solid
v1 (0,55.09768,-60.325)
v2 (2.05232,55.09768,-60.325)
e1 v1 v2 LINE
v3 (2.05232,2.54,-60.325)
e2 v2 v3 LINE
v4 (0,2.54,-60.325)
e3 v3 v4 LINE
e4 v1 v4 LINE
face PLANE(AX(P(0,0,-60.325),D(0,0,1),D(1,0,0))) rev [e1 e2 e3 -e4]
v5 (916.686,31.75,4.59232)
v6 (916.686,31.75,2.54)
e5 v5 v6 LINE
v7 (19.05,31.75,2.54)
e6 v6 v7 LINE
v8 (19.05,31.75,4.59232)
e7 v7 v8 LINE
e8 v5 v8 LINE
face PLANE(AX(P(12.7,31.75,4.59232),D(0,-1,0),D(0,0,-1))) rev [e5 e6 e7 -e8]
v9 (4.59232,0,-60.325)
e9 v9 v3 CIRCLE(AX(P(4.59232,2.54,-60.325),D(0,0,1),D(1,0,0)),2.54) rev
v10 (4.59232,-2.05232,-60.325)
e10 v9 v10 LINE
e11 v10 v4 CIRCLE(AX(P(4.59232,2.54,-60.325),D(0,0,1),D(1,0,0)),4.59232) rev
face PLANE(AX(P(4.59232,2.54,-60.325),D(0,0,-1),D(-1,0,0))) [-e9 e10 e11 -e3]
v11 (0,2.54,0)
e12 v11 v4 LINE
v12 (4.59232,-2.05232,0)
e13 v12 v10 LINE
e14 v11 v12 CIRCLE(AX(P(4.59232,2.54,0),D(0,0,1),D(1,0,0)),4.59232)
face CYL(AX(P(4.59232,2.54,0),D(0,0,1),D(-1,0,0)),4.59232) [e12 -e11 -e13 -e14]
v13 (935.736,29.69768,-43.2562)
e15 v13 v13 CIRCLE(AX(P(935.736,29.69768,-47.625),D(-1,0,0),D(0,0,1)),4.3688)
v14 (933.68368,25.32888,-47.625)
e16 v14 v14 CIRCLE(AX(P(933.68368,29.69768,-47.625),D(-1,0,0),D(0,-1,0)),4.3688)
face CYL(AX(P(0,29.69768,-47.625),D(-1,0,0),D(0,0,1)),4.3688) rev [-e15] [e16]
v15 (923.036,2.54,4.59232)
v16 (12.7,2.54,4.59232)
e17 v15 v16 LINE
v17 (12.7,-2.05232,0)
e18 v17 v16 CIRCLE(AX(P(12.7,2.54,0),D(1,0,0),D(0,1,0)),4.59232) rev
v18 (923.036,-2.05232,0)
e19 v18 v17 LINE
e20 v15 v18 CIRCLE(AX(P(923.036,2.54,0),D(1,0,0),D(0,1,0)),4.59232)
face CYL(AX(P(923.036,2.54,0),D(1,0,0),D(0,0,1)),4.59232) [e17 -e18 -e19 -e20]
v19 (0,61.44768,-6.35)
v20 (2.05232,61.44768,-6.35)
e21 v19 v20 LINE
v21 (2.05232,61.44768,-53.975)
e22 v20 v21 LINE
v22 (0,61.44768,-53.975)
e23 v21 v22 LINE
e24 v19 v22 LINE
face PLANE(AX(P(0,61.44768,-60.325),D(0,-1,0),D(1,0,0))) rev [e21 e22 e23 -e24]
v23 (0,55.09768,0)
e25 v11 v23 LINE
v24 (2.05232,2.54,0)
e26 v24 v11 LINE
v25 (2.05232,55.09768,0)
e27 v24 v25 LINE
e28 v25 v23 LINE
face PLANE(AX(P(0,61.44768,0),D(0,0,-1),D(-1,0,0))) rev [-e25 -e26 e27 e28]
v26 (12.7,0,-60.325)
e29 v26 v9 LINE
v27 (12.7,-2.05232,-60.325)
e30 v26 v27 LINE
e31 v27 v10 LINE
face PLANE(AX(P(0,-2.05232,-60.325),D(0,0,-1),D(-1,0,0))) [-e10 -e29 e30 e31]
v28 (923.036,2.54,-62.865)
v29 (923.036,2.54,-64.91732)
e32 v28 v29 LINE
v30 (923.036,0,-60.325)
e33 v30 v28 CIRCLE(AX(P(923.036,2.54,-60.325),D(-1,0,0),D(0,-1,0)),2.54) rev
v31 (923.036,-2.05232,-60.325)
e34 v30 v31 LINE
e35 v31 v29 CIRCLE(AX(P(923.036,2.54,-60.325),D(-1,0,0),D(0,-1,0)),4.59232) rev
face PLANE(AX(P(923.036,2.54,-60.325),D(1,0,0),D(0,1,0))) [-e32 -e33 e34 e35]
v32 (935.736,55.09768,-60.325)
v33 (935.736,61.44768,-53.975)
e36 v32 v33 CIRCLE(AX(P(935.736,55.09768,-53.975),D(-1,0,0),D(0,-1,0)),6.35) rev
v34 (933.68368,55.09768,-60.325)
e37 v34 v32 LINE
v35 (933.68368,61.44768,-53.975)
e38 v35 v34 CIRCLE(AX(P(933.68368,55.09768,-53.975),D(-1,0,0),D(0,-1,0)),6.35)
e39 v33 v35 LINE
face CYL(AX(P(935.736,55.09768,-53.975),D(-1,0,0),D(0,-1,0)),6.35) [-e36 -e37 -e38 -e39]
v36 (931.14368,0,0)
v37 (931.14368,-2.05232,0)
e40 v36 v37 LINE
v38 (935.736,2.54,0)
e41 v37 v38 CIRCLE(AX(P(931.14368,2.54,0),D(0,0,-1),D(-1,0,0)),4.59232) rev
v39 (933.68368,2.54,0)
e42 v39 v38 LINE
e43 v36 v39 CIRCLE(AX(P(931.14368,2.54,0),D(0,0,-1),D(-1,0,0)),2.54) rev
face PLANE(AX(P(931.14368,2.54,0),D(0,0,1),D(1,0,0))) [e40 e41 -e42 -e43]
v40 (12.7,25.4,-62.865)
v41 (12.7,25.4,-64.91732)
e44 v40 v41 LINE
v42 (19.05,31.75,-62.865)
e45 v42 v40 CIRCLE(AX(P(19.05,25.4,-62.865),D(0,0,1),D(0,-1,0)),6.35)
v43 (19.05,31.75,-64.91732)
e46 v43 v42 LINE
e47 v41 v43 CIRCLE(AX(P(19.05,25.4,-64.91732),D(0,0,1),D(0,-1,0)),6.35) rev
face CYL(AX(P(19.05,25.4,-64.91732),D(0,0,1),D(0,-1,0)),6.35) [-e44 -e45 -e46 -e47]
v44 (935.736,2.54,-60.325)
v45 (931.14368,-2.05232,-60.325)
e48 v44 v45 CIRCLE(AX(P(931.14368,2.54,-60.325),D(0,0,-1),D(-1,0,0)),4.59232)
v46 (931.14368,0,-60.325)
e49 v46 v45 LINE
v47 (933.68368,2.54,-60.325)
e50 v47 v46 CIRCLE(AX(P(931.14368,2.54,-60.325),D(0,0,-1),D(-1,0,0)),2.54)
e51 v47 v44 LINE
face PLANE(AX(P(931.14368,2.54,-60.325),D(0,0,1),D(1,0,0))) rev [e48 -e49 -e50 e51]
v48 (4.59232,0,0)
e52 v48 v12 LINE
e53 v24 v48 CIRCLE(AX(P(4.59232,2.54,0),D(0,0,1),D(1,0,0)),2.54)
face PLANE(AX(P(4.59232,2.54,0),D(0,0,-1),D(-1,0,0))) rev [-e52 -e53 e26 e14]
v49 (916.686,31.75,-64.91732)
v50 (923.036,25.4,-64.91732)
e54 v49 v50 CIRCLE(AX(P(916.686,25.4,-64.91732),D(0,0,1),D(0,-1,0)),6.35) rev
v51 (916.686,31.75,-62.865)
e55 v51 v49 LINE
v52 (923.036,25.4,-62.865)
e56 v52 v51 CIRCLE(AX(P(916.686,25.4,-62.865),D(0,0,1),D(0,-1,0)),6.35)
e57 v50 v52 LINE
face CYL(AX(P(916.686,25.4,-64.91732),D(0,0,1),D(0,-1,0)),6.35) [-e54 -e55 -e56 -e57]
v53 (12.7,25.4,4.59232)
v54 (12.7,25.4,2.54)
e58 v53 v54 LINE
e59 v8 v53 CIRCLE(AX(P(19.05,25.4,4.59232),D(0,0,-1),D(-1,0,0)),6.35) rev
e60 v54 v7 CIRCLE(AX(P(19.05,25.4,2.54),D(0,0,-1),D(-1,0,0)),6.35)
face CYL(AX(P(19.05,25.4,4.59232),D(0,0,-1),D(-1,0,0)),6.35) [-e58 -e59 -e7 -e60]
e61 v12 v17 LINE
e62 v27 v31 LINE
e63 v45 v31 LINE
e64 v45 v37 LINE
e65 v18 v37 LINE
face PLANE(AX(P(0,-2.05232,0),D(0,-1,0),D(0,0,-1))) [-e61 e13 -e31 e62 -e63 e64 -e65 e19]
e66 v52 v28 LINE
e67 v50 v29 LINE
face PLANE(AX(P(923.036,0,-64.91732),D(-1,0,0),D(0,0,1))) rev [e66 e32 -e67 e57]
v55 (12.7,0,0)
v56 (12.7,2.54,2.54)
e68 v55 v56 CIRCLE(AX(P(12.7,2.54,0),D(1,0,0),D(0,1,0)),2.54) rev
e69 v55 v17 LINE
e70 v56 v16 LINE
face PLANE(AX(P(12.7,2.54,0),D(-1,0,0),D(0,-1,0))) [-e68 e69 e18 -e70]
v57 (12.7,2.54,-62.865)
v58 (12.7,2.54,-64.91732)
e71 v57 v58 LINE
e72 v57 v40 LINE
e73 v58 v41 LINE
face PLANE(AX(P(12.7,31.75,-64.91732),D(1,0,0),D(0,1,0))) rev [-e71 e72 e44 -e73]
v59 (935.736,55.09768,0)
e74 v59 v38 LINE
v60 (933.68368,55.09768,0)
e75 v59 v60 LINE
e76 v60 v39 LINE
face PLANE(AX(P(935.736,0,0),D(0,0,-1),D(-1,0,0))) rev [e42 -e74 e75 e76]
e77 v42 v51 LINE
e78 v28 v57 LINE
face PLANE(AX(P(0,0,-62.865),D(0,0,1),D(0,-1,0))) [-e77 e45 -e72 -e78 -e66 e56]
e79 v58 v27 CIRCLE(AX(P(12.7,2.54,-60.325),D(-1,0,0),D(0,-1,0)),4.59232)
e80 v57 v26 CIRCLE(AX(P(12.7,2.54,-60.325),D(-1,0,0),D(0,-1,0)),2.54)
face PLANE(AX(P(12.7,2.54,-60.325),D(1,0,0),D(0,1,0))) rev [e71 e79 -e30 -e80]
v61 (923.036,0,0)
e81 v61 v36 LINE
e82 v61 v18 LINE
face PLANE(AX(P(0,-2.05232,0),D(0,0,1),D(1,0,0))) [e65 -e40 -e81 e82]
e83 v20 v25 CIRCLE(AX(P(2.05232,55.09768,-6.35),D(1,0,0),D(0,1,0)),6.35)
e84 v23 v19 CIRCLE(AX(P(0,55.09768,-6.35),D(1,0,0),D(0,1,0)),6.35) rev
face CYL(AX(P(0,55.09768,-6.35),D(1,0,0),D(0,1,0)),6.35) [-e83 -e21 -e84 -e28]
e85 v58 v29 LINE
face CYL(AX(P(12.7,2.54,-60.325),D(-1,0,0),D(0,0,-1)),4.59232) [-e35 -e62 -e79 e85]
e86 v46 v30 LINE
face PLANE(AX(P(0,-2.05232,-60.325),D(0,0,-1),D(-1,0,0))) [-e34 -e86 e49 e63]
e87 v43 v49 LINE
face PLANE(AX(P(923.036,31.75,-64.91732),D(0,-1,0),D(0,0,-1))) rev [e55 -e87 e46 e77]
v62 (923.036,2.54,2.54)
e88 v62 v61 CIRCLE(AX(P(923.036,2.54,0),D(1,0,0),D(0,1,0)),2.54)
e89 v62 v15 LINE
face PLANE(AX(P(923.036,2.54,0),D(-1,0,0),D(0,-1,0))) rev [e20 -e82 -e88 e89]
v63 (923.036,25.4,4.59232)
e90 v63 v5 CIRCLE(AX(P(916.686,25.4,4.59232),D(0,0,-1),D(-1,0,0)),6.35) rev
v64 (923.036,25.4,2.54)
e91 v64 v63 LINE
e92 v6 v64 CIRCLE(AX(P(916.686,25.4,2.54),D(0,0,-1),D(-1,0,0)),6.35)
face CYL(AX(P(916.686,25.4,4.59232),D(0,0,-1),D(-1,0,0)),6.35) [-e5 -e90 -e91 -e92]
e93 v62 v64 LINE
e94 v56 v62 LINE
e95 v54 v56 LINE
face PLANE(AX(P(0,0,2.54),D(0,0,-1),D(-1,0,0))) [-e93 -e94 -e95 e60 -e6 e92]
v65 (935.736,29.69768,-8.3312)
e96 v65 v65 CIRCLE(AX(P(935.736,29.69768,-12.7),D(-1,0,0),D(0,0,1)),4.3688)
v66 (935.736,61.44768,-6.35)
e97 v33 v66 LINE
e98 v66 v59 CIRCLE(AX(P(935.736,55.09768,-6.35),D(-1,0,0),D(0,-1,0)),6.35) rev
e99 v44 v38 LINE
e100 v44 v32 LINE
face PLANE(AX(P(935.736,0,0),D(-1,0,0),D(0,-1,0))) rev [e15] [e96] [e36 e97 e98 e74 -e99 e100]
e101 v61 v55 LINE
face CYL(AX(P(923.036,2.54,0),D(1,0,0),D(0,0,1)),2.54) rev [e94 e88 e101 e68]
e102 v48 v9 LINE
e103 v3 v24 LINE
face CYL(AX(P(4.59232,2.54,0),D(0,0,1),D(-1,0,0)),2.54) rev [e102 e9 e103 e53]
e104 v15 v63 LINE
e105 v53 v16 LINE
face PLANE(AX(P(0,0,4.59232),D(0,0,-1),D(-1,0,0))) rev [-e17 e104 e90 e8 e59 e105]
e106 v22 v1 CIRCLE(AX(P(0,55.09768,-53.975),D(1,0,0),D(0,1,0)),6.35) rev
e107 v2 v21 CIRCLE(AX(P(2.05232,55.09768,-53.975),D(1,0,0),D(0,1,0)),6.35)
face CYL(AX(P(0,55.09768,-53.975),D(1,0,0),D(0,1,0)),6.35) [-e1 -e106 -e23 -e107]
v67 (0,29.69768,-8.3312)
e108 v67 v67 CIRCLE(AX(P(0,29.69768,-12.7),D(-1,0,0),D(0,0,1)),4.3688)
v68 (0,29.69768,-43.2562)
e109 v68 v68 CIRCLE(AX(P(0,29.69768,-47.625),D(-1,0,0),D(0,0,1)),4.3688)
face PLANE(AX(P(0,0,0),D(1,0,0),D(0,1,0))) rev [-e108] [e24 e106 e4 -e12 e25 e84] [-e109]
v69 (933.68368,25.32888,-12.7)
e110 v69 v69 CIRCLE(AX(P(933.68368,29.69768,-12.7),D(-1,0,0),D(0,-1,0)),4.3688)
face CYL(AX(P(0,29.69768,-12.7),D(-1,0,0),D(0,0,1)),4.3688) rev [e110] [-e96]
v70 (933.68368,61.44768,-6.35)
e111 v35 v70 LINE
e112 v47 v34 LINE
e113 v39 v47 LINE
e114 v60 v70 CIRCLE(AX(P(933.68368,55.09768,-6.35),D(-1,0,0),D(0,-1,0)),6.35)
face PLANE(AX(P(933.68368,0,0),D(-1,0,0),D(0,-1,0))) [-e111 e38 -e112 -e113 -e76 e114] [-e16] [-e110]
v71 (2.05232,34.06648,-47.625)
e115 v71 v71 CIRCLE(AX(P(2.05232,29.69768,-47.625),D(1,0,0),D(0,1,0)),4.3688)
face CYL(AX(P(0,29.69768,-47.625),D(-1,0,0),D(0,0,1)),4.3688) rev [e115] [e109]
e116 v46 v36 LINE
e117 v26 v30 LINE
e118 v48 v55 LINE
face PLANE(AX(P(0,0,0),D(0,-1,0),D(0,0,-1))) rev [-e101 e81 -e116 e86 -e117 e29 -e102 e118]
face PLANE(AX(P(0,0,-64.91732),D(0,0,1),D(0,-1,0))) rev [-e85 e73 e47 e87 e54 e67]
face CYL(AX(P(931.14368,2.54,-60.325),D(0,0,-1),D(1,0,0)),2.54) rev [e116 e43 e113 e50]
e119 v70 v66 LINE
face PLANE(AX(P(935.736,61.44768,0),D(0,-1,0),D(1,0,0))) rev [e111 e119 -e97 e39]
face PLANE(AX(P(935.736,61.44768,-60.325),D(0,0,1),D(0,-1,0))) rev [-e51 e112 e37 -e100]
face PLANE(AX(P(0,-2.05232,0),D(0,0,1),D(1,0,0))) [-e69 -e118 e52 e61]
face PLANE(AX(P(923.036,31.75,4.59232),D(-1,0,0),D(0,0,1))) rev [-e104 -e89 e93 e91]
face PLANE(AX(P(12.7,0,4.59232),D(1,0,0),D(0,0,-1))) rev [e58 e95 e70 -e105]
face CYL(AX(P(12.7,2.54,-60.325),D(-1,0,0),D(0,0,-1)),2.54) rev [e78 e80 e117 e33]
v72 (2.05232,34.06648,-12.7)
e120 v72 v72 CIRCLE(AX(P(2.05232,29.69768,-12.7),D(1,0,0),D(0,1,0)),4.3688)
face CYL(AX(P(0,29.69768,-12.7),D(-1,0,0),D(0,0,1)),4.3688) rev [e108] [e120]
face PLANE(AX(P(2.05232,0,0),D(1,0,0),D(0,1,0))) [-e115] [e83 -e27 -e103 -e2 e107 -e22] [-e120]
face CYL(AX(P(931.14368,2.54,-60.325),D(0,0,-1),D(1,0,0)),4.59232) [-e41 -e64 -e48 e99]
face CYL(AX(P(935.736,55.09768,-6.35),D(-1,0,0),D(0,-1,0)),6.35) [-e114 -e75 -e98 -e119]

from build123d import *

# Parameters (mm, degrees)
SKETCH1_W                                 = 935.736
SKETCH1_H                                 = 60.325
BASE_FLANGE1_DEPTH                        = 2.05232
EDGE_FLANGE1_DEPTH                        = 910.336
EDGE_FLANGE1_BEND_DEPTH                   = 910.336
EDGE_FLANGE2_STRIP_W                      = 13.28928
EDGE_FLANGE2_STRIP_H                      = 2.05232
EDGE_FLANGE2_STRIP_CUT_DEPTH              = 60.325
EDGE_FLANGE2_STRIP_2_W                    = 13.28928
EDGE_FLANGE2_STRIP_2_H                    = 2.05232
EDGE_FLANGE2_STRIP_CUT_2_DEPTH            = 60.325
EDGE_FLANGE2_DEPTH                        = 60.325
EDGE_FLANGE2_BEND_DEPTH                   = 60.325
HOLE_FOR_1_4_SELF_CLINCHING_NUTS_S_SS_C_D = 8.7376
BREAK_CORNER1_DEPTH                       = 935.736
BREAK_CORNER1_START                       = -64.91732
BREAK_CORNER1_2_DEPTH                     = 69.50964


# Read off the part's stored shape, not the designer's step: Break-Corner1
# Sheet-metal steps are written as plain solids
with BuildPart() as part:
    # Sketch1 → Base-Flange1 (new body)
    with BuildSketch(Plane(origin=(0, 0, 0), x_dir=(1, 0, 0), z_dir=(0, 1, 0))):
        with Locations((467.868, 30.1625)):
            Rectangle(SKETCH1_W, SKETCH1_H)
    extrude(amount=-BASE_FLANGE1_DEPTH)

    # Edge-Flange1 section (across the edge) → Edge-Flange1 (add)
    with BuildSketch(Plane(origin=(923.036, 0, -62.865), x_dir=(0, 0, 1), z_dir=(-1, 0, 0))):
        with BuildLine():
            Line((-2.05232, 2.54), (-2.05232, 31.75))
            Line((-2.05232, 31.75), (0, 31.75))
            Line((0, 31.75), (0, 2.54))
            ThreePointArc((0, 2.54), (0.743948776, 0.743948776), (2.54, 0))
            Line((2.54, 0), (2.54, -2.05232))
            ThreePointArc((2.54, -2.05232), (-0.707260613, -0.707260613), (-2.05232, 2.54))
        make_face()
    extrude(amount=EDGE_FLANGE1_DEPTH)

    # Edge-Flange1 section 2 (across the edge) → Edge-Flange1 bend (add)
    with BuildSketch(Plane(origin=(12.7, 0, 2.54), x_dir=(0, 0, -1), z_dir=(1, 0, 0))):
        with BuildLine():
            Line((-2.05232, 2.54), (-2.05232, 31.75))
            Line((-2.05232, 31.75), (0, 31.75))
            Line((0, 31.75), (0, 2.54))
            ThreePointArc((0, 2.54), (0.743948776, 0.743948776), (2.54, 0))
            Line((2.54, 0), (2.54, -2.05232))
            ThreePointArc((2.54, -2.05232), (-0.707260613, -0.707260613), (-2.05232, 2.54))
        make_face()
    extrude(amount=EDGE_FLANGE1_BEND_DEPTH)

    # Edge-Flange2 strip (across the edge) → Edge-Flange2 strip cut (cut)
    with BuildSketch(Plane.XY.offset(-60.325)):
        with Locations((-2.05232, -1.02616)):
            Rectangle(EDGE_FLANGE2_STRIP_W, EDGE_FLANGE2_STRIP_H)
    extrude(amount=EDGE_FLANGE2_STRIP_CUT_DEPTH, mode=Mode.SUBTRACT)

    # Edge-Flange2 strip 2 (across the edge) → Edge-Flange2 strip cut 2 (cut)
    with BuildSketch(Plane(origin=(935.736, 0, 0), x_dir=(-1, 0, 0), z_dir=(0, 0, -1))):
        with Locations((-2.05232, -1.02616)):
            Rectangle(EDGE_FLANGE2_STRIP_2_W, EDGE_FLANGE2_STRIP_2_H)
    extrude(amount=EDGE_FLANGE2_STRIP_CUT_2_DEPTH, mode=Mode.SUBTRACT)

    # Edge-Flange2 section (across the edge) → Edge-Flange2 (add)
    with BuildSketch(Plane.XY.offset(-60.325)):
        with BuildLine():
            Line((0, 2.54), (0, 61.44768))
            Line((0, 61.44768), (2.05232, 61.44768))
            Line((2.05232, 61.44768), (2.05232, 2.54))
            ThreePointArc((2.05232, 2.54), (2.796268776, 0.743948776), (4.59232, 0))
            Line((4.59232, 0), (4.59232, -2.05232))
            ThreePointArc((4.59232, -2.05232), (1.345059387, -0.707260613), (0, 2.54))
        make_face()
    extrude(amount=EDGE_FLANGE2_DEPTH)

    # Edge-Flange2 section 2 (across the edge) → Edge-Flange2 bend (add)
    with BuildSketch(Plane(origin=(935.736, 0, 0), x_dir=(-1, 0, 0), z_dir=(0, 0, -1))):
        with BuildLine():
            Line((0, 2.54), (0, 61.44768))
            Line((0, 61.44768), (2.05232, 61.44768))
            Line((2.05232, 61.44768), (2.05232, 2.54))
            ThreePointArc((2.05232, 2.54), (2.796268776, 0.743948776), (4.59232, 0))
            Line((4.59232, 0), (4.59232, -2.05232))
            ThreePointArc((4.59232, -2.05232), (1.345059387, -0.707260613), (0, 2.54))
        make_face()
    extrude(amount=EDGE_FLANGE2_BEND_DEPTH)

    # Hole for 1/4 Self-clinching Nuts (S,SS,CLS,CLSS)1 (through all)
    with Locations(Plane.ZY):
        with Locations((-47.625, 29.69768), (-12.7, 29.69768)):
            Hole(HOLE_FOR_1_4_SELF_CLINCHING_NUTS_S_SS_C_D / 2)

    # Break-Corner1 outline → Break-Corner1 (cut)
    with BuildSketch(Plane.YZ):
        with BuildLine():
            ThreePointArc((55.09768, 0), (59.587808061, -1.859871939), (61.44768, -6.35))
            Line((61.44768, -6.35), (61.44768, 0))
            Line((61.44768, 0), (55.09768, 0))
        make_face()
        with BuildLine():
            Line((61.44768, -60.325), (61.44768, -53.975))
            ThreePointArc((61.44768, -53.975), (59.587808061, -58.465128061), (55.09768, -60.325))
            Line((55.09768, -60.325), (61.44768, -60.325))
        make_face()
    extrude(amount=BREAK_CORNER1_DEPTH, mode=Mode.SUBTRACT)

    # Break-Corner1 2 outline → Break-Corner1 2 (cut)
    with BuildSketch(Plane.XY.offset(BREAK_CORNER1_START)):
        with BuildLine():
            Line((12.7, 31.75), (12.7, 25.4))
            ThreePointArc((12.7, 25.4), (14.559871939, 29.890128061), (19.05, 31.75))
            Line((19.05, 31.75), (12.7, 31.75))
        make_face()
        with BuildLine():
            Line((923.036, 31.75), (916.686, 31.75))
            ThreePointArc((916.686, 31.75), (921.176128061, 29.890128061), (923.036, 25.4))
            Line((923.036, 25.4), (923.036, 31.75))
        make_face()
    extrude(amount=BREAK_CORNER1_2_DEPTH, mode=Mode.SUBTRACT)


solid = part.part
